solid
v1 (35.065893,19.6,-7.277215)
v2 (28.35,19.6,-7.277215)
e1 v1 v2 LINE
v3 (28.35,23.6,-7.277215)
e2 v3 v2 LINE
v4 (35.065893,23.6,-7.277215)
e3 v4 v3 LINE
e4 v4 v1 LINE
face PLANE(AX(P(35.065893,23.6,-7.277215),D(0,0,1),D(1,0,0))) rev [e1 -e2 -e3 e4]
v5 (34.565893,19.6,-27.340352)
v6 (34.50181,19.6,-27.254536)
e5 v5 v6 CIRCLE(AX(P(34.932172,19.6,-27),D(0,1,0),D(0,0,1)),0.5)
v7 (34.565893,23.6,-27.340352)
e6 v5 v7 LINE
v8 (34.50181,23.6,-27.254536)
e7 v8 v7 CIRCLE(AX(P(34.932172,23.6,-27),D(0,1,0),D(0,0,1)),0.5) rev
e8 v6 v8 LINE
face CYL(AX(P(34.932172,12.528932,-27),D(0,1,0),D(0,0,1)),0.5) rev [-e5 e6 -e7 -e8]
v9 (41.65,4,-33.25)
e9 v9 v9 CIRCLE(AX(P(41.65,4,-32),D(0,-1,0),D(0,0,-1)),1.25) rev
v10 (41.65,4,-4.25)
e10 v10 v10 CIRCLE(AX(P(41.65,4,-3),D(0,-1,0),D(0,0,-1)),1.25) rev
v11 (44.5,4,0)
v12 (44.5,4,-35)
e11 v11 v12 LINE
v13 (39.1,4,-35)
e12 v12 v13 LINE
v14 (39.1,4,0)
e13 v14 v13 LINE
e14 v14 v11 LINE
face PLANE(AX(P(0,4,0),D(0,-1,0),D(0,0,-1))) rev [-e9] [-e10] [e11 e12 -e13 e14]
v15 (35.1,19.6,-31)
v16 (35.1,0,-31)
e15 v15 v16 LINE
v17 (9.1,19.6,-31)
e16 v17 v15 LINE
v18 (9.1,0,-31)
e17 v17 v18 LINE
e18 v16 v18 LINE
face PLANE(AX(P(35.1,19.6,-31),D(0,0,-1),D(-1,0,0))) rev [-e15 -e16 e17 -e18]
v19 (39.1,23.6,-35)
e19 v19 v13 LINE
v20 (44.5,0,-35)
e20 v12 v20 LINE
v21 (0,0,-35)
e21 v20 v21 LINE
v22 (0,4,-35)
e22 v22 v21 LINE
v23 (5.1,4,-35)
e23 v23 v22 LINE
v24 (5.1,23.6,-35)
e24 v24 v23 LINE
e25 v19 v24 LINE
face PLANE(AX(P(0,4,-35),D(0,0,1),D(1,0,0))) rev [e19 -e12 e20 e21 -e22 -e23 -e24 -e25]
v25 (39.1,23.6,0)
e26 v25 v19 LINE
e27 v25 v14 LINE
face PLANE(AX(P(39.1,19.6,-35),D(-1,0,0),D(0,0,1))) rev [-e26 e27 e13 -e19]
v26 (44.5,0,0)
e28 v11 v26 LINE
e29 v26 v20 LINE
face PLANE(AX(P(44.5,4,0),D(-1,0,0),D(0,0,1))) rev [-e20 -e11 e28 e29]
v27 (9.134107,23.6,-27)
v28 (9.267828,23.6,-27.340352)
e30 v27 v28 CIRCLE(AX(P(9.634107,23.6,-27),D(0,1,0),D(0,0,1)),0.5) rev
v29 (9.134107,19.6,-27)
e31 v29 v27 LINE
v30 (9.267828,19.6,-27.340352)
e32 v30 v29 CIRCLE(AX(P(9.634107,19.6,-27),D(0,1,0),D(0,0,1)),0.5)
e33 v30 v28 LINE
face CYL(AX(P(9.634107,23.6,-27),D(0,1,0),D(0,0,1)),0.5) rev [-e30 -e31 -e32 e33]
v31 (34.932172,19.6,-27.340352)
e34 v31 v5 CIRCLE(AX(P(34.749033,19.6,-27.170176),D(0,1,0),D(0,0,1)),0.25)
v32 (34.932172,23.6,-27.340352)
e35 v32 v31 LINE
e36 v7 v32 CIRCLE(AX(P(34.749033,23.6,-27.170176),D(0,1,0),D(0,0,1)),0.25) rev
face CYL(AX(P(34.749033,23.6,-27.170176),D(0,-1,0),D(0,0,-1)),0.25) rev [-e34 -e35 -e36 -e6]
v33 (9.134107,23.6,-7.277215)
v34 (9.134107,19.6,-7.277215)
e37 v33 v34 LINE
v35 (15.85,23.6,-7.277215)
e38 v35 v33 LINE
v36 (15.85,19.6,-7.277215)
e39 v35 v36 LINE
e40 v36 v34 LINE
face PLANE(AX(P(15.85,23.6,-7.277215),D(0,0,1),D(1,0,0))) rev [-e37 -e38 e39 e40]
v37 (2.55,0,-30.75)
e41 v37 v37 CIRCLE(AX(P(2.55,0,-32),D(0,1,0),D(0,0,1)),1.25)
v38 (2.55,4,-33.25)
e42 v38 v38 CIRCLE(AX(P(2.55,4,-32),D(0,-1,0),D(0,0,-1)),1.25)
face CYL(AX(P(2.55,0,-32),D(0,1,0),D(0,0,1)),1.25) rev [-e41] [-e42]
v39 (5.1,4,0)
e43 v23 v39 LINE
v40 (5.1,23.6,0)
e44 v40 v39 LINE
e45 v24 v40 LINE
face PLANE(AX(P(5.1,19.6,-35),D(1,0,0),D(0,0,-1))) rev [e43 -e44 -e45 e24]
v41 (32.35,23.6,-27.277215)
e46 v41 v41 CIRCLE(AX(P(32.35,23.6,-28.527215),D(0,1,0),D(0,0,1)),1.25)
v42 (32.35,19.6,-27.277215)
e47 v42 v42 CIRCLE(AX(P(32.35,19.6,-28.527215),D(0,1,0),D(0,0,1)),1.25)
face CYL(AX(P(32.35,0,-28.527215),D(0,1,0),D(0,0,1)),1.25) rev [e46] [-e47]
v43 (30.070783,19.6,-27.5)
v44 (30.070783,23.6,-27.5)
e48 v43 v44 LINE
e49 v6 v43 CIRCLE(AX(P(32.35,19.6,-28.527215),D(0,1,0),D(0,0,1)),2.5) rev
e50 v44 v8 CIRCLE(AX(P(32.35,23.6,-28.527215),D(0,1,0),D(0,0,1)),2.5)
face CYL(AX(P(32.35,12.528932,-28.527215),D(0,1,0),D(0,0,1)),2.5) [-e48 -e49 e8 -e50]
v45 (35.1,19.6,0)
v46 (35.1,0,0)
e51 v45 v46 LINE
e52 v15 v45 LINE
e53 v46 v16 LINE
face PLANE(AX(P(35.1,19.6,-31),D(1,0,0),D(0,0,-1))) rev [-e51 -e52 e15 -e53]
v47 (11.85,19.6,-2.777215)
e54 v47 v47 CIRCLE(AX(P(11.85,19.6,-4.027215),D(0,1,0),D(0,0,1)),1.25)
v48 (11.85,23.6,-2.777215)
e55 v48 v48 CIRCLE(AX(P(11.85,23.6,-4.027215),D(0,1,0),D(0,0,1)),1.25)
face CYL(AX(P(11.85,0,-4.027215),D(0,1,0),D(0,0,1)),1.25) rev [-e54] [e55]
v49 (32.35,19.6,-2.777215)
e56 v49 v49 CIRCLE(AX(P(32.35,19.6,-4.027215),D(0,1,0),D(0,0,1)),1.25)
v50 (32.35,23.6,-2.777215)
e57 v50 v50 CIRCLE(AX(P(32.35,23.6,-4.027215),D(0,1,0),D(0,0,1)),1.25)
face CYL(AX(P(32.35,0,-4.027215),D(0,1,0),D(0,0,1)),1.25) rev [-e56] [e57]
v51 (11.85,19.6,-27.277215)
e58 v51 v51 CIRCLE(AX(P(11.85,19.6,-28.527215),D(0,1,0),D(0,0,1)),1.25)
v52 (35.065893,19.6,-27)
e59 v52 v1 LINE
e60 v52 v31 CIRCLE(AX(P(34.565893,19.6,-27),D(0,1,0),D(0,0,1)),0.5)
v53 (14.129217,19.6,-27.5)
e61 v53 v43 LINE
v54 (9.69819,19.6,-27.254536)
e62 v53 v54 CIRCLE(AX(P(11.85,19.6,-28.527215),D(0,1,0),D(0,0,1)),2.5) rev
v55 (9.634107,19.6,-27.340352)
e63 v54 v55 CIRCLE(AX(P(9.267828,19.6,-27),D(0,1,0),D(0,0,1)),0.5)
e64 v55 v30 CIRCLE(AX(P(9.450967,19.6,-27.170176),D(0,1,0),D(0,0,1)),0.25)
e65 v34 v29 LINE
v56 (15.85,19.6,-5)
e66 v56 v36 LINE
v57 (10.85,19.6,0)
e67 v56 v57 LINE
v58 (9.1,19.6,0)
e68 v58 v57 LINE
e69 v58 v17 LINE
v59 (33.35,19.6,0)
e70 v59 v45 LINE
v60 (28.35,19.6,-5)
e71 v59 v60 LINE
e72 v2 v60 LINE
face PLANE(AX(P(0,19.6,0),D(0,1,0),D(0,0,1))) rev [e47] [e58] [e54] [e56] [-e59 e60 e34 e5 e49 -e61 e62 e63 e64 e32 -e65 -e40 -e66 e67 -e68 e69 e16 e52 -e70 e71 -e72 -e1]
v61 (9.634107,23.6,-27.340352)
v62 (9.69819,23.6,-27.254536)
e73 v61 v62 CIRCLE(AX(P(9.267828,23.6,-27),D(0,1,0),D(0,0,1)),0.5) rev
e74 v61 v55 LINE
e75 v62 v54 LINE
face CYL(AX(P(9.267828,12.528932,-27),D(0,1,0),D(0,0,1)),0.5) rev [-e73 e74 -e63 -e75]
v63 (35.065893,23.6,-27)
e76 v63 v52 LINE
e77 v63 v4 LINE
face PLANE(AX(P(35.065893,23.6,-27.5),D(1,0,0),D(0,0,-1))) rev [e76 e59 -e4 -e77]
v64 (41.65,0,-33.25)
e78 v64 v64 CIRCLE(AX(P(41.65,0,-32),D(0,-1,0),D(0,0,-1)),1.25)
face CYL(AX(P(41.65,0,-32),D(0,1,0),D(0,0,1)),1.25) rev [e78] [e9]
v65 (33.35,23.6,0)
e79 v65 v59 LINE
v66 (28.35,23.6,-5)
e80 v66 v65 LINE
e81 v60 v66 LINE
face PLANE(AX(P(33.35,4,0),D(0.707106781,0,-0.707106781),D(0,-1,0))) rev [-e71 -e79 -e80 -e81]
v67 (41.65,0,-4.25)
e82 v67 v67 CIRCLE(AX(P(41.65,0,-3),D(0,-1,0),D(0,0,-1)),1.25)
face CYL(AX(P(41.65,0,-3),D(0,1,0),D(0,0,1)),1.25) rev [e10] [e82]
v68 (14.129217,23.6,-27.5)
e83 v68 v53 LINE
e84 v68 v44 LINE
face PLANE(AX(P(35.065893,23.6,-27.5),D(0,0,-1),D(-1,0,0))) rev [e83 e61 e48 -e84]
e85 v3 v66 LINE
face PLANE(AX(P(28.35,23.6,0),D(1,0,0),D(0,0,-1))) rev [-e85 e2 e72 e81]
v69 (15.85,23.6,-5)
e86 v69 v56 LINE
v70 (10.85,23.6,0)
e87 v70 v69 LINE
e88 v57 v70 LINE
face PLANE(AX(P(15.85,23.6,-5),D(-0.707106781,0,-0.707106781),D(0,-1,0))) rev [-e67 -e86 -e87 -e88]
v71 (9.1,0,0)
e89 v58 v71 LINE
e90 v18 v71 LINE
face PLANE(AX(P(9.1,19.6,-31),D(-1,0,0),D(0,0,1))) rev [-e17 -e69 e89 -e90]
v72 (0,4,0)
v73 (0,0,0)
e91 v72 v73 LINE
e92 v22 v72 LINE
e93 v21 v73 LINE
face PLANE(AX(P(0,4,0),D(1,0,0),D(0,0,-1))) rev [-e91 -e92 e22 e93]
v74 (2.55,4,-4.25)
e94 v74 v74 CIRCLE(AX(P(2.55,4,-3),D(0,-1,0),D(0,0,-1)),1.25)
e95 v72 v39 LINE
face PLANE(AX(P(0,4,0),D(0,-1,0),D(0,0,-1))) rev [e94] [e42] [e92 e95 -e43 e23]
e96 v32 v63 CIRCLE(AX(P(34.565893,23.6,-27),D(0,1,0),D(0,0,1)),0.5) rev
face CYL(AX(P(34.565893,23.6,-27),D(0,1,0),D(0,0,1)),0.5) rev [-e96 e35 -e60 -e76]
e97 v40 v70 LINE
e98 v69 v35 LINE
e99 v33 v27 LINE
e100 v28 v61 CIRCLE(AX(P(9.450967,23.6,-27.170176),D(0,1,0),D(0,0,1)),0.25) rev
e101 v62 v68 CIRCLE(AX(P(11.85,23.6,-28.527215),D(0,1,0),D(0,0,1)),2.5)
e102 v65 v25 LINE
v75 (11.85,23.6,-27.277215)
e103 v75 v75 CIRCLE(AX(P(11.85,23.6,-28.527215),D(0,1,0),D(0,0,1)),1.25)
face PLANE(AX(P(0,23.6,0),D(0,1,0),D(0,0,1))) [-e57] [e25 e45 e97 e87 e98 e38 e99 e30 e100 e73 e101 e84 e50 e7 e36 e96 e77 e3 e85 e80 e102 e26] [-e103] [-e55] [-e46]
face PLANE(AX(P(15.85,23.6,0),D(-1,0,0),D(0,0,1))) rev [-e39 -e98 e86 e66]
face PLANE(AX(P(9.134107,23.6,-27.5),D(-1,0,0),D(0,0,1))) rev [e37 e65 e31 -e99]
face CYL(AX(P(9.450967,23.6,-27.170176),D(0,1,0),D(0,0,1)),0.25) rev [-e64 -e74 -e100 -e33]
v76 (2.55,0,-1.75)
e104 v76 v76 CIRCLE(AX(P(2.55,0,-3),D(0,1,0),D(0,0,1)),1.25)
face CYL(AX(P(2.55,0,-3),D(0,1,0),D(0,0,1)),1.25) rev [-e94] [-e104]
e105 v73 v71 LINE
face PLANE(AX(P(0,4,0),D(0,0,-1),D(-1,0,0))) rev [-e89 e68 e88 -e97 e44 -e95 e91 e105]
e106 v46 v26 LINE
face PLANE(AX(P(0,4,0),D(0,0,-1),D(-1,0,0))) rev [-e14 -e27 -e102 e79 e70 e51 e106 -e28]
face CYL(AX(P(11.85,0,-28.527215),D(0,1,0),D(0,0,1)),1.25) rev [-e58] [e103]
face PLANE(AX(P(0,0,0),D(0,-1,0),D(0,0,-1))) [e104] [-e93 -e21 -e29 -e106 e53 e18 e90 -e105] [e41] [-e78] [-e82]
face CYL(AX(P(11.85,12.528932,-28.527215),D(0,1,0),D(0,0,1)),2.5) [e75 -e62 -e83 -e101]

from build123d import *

# Parameters (mm, degrees)
SKETCH1_W               = 44.5
SKETCH1_H               = 35
BOSS_EXTRUDE1_DEPTH     = 4
BOSS_EXTRUDE2_DEPTH     = 19.6
SKETCH4_W               = 26
SKETCH4_H               = 31
CUT_EXTRUDE1_DEPTH      = 4
BOSS_EXTRUDE3_DEPTH     = 4
CHAMFER1_SIZE           = 5
CUT_EXTRUDE2_DEPTH      = 62.336856783
CUT_EXTRUDE2_DEPTH_BACK = 62.336856783
SKETCH6_R               = 1.25
SKETCH7_R               = 2.5
SKETCH7_R_2             = 1.25
BOSS_EXTRUDE4_DEPTH     = 4
FILLET1_R               = 0.5
FILLET3_R               = 0.25
CUT_EXTRUDE3_DEPTH      = 60.911685095
CUT_EXTRUDE3_DEPTH_BACK = 60.911685095
SKETCH8_R               = 1.25


with BuildPart() as part:
    # Sketch1 → Boss-Extrude1 (new body)
    with BuildSketch(Plane(origin=(0, 0, 0), x_dir=(1, 0, 0), z_dir=(0, 1, 0))):
        with Locations((22.25, 17.5)):
            Rectangle(SKETCH1_W, SKETCH1_H)
    extrude(amount=BOSS_EXTRUDE1_DEPTH)

    # Sketch3 → Boss-Extrude2 (add)
    with BuildSketch(Plane(origin=(0, 0, 0), x_dir=(1, 0, 0), z_dir=(0, 1, 0))):
        Polygon((9.1, 31), (9.1, 0), (5.1, 0), (5.1, 35), (39.1, 35), (39.1, 0), (35.1, 0), (35.1, 31), align=None)
    extrude(amount=BOSS_EXTRUDE2_DEPTH)

    # Sketch4 → Cut-Extrude1 (cut)
    with BuildSketch(Plane(origin=(0, 4, 0), x_dir=(1, 0, 0), z_dir=(0, 1, 0))):
        with Locations((22.1, 15.5)):
            Rectangle(SKETCH4_W, SKETCH4_H)
    extrude(amount=-CUT_EXTRUDE1_DEPTH, mode=Mode.SUBTRACT)

    # Sketch5 → Boss-Extrude3 (add)
    with BuildSketch(Plane(origin=(0, 19.6, 0), x_dir=(1, 0, 0), z_dir=(0, 1, 0))):
        Polygon((15.85, 0), (5.1, 0), (5.1, 35), (39.1, 35), (39.1, 0), (28.35, 0), (28.35, 7.277215151), (35.065893154, 7.277215151), (35.065893154, 27.5), (9.134106846, 27.5), (9.134106846, 7.277215151), (15.85, 7.277215151), align=None)
    extrude(amount=BOSS_EXTRUDE3_DEPTH)

    # Chamfer1
    chamfer1_edges = [part.edges().sort_by_distance(p)[0] for p in [
        (15.85, 21.6, 0),
        (28.35, 21.6, 0),
    ]]
    chamfer(chamfer1_edges, length=CHAMFER1_SIZE)

    # Sketch6 → Cut-Extrude2 (cut, two sides: drawn at the far end of the back side and taken through both)
    with BuildSketch(Plane(origin=(0, 23.6, 0), x_dir=(1, 0, 0), z_dir=(0, 1, 0)).offset(-CUT_EXTRUDE2_DEPTH_BACK)):
        with Locations(Location((11.85, 4.027215151, 0), (0, 0, 270))):
            Circle(SKETCH6_R)
        with Locations(Location((32.35, 4.027215151, 0), (0, 0, 270))):
            Circle(SKETCH6_R)
        with BuildLine():
            ThreePointArc((11.137729662, 27.5), (11.85, 27.277215151), (12.562270338, 27.5))
            Line((12.562270338, 27.5), (11.137729662, 27.5))
        make_face()
        with BuildLine():
            Line((11.137729662, 27.5), (12.562270338, 27.5))
            ThreePointArc((12.562270338, 27.5), (12.957438017, 27.947490182), (13.1, 28.527215151))
            ThreePointArc((13.1, 28.527215151), (11.270275032, 29.634653168), (11.137729662, 27.5))
        make_face()
        with BuildLine():
            ThreePointArc((33.062270338, 27.5), (33.457438017, 27.947490182), (33.6, 28.527215151))
            ThreePointArc((33.6, 28.527215151), (31.770275032, 29.634653168), (31.637729662, 27.5))
            Line((31.637729662, 27.5), (33.062270338, 27.5))
        make_face()
        with BuildLine():
            Line((33.062270338, 27.5), (31.637729662, 27.5))
            ThreePointArc((31.637729662, 27.5), (32.35, 27.277215151), (33.062270338, 27.5))
        make_face()
    extrude(amount=CUT_EXTRUDE2_DEPTH + CUT_EXTRUDE2_DEPTH_BACK, mode=Mode.SUBTRACT)

    # Sketch7 → Boss-Extrude4 (add)
    # profile 1 of 2: a face of its own
    with BuildSketch(Plane(origin=(0, 23.6, 0), x_dir=(1, 0, 0), z_dir=(0, 1, 0))):
        with Locations((11.85, 28.527215151)):
            Circle(SKETCH7_R)
        with Locations(Location((11.85, 28.527215151, 0), (0, 0, 270))):
            Circle(SKETCH7_R_2, mode=Mode.SUBTRACT)
    # profile 2 of 2: a face of its own
    with BuildSketch(Plane(origin=(0, 23.6, 0), x_dir=(1, 0, 0), z_dir=(0, 1, 0))):
        with Locations((32.35, 28.527215151)):
            Circle(SKETCH7_R)
        with Locations(Location((32.35, 28.527215151, 0), (0, 0, 270))):
            Circle(SKETCH7_R_2, mode=Mode.SUBTRACT)
    extrude(amount=-BOSS_EXTRUDE4_DEPTH)

    # Fillet1
    # the kernel refuses this fillet: 0.5 mm, written as the material it adds along each edge
    with BuildSketch(Plane(origin=(35.065893154, 19.6, -27.5), x_dir=(0, 0, 1), z_dir=(0, 1, 0)), Plane(origin=(9.134106846, 19.6, -27.5), x_dir=(1, 0, 0), z_dir=(0, 1, 0))) as fillet1_piece_1:
        with BuildLine():
            CenterArc((FILLET1_R, -FILLET1_R), FILLET1_R, 90, 90)
            Line((0, -FILLET1_R), (0, 0))
            Line((0, 0), (FILLET1_R, 0))
        make_face()
    extrude(amount=4)
    with BuildSketch(Plane(origin=(34.629216759, 19.6, -27.5), x_dir=(1, 0, 0), z_dir=(0, 1, 0))) as fillet1_piece_2:
        with BuildLine():
            CenterArc((0.30295556, -0.5), FILLET1_R, 90, 59.397982961)
            ThreePointArc((-0.127406493, -0.245464142), (-0.060306377, -0.124495193), (0, 0))
            Line((0, 0), (0.30295556, 0))
        make_face()
    extrude(amount=4)
    with BuildSketch(Plane(origin=(9.570783241, 19.6, -27.5), x_dir=(0.46068413755870835, 0, 0.8875641528372973), z_dir=(0, 1, 0))) as fillet1_piece_3:
        with BuildLine():
            CenterArc((0.304215256, -0.499234564), FILLET1_R, 93.170754575, 59.397982961)
            Line((-0.139566821, -0.268892495), (0, 0))
            ThreePointArc((0, 0), (0.138279662, -0.003827182), (0.276559323, 0))
        make_face()
    extrude(amount=4)

    # Fillet3
    fillet3_edges = [part.edges().sort_by_distance(p)[0] for p in [
        (34.749032737, 21.6, -27.465252505),
        (9.450967263, 21.6, -27.465252505),
    ]]
    fillet(fillet3_edges, radius=FILLET3_R)

    # Sketch8 → Cut-Extrude3 (cut, two sides: drawn at the far end of the back side and taken through both)
    with BuildSketch(Plane(origin=(0, 4, 0), x_dir=(1, 0, 0), z_dir=(0, 1, 0)).offset(-CUT_EXTRUDE3_DEPTH_BACK)):
        with Locations(Location((2.55, 32, 0), (0, 0, 270))):
            Circle(SKETCH8_R)
        with Locations(Location((41.65, 32, 0), (0, 0, 90))):
            Circle(SKETCH8_R)
        with Locations(Location((2.55, 3, 0), (0, 0, 270))):
            Circle(SKETCH8_R)
        with Locations(Location((41.65, 3, 0), (0, 0, 90))):
            Circle(SKETCH8_R)
    extrude(amount=CUT_EXTRUDE3_DEPTH + CUT_EXTRUDE3_DEPTH_BACK, mode=Mode.SUBTRACT)


solid = part.part
